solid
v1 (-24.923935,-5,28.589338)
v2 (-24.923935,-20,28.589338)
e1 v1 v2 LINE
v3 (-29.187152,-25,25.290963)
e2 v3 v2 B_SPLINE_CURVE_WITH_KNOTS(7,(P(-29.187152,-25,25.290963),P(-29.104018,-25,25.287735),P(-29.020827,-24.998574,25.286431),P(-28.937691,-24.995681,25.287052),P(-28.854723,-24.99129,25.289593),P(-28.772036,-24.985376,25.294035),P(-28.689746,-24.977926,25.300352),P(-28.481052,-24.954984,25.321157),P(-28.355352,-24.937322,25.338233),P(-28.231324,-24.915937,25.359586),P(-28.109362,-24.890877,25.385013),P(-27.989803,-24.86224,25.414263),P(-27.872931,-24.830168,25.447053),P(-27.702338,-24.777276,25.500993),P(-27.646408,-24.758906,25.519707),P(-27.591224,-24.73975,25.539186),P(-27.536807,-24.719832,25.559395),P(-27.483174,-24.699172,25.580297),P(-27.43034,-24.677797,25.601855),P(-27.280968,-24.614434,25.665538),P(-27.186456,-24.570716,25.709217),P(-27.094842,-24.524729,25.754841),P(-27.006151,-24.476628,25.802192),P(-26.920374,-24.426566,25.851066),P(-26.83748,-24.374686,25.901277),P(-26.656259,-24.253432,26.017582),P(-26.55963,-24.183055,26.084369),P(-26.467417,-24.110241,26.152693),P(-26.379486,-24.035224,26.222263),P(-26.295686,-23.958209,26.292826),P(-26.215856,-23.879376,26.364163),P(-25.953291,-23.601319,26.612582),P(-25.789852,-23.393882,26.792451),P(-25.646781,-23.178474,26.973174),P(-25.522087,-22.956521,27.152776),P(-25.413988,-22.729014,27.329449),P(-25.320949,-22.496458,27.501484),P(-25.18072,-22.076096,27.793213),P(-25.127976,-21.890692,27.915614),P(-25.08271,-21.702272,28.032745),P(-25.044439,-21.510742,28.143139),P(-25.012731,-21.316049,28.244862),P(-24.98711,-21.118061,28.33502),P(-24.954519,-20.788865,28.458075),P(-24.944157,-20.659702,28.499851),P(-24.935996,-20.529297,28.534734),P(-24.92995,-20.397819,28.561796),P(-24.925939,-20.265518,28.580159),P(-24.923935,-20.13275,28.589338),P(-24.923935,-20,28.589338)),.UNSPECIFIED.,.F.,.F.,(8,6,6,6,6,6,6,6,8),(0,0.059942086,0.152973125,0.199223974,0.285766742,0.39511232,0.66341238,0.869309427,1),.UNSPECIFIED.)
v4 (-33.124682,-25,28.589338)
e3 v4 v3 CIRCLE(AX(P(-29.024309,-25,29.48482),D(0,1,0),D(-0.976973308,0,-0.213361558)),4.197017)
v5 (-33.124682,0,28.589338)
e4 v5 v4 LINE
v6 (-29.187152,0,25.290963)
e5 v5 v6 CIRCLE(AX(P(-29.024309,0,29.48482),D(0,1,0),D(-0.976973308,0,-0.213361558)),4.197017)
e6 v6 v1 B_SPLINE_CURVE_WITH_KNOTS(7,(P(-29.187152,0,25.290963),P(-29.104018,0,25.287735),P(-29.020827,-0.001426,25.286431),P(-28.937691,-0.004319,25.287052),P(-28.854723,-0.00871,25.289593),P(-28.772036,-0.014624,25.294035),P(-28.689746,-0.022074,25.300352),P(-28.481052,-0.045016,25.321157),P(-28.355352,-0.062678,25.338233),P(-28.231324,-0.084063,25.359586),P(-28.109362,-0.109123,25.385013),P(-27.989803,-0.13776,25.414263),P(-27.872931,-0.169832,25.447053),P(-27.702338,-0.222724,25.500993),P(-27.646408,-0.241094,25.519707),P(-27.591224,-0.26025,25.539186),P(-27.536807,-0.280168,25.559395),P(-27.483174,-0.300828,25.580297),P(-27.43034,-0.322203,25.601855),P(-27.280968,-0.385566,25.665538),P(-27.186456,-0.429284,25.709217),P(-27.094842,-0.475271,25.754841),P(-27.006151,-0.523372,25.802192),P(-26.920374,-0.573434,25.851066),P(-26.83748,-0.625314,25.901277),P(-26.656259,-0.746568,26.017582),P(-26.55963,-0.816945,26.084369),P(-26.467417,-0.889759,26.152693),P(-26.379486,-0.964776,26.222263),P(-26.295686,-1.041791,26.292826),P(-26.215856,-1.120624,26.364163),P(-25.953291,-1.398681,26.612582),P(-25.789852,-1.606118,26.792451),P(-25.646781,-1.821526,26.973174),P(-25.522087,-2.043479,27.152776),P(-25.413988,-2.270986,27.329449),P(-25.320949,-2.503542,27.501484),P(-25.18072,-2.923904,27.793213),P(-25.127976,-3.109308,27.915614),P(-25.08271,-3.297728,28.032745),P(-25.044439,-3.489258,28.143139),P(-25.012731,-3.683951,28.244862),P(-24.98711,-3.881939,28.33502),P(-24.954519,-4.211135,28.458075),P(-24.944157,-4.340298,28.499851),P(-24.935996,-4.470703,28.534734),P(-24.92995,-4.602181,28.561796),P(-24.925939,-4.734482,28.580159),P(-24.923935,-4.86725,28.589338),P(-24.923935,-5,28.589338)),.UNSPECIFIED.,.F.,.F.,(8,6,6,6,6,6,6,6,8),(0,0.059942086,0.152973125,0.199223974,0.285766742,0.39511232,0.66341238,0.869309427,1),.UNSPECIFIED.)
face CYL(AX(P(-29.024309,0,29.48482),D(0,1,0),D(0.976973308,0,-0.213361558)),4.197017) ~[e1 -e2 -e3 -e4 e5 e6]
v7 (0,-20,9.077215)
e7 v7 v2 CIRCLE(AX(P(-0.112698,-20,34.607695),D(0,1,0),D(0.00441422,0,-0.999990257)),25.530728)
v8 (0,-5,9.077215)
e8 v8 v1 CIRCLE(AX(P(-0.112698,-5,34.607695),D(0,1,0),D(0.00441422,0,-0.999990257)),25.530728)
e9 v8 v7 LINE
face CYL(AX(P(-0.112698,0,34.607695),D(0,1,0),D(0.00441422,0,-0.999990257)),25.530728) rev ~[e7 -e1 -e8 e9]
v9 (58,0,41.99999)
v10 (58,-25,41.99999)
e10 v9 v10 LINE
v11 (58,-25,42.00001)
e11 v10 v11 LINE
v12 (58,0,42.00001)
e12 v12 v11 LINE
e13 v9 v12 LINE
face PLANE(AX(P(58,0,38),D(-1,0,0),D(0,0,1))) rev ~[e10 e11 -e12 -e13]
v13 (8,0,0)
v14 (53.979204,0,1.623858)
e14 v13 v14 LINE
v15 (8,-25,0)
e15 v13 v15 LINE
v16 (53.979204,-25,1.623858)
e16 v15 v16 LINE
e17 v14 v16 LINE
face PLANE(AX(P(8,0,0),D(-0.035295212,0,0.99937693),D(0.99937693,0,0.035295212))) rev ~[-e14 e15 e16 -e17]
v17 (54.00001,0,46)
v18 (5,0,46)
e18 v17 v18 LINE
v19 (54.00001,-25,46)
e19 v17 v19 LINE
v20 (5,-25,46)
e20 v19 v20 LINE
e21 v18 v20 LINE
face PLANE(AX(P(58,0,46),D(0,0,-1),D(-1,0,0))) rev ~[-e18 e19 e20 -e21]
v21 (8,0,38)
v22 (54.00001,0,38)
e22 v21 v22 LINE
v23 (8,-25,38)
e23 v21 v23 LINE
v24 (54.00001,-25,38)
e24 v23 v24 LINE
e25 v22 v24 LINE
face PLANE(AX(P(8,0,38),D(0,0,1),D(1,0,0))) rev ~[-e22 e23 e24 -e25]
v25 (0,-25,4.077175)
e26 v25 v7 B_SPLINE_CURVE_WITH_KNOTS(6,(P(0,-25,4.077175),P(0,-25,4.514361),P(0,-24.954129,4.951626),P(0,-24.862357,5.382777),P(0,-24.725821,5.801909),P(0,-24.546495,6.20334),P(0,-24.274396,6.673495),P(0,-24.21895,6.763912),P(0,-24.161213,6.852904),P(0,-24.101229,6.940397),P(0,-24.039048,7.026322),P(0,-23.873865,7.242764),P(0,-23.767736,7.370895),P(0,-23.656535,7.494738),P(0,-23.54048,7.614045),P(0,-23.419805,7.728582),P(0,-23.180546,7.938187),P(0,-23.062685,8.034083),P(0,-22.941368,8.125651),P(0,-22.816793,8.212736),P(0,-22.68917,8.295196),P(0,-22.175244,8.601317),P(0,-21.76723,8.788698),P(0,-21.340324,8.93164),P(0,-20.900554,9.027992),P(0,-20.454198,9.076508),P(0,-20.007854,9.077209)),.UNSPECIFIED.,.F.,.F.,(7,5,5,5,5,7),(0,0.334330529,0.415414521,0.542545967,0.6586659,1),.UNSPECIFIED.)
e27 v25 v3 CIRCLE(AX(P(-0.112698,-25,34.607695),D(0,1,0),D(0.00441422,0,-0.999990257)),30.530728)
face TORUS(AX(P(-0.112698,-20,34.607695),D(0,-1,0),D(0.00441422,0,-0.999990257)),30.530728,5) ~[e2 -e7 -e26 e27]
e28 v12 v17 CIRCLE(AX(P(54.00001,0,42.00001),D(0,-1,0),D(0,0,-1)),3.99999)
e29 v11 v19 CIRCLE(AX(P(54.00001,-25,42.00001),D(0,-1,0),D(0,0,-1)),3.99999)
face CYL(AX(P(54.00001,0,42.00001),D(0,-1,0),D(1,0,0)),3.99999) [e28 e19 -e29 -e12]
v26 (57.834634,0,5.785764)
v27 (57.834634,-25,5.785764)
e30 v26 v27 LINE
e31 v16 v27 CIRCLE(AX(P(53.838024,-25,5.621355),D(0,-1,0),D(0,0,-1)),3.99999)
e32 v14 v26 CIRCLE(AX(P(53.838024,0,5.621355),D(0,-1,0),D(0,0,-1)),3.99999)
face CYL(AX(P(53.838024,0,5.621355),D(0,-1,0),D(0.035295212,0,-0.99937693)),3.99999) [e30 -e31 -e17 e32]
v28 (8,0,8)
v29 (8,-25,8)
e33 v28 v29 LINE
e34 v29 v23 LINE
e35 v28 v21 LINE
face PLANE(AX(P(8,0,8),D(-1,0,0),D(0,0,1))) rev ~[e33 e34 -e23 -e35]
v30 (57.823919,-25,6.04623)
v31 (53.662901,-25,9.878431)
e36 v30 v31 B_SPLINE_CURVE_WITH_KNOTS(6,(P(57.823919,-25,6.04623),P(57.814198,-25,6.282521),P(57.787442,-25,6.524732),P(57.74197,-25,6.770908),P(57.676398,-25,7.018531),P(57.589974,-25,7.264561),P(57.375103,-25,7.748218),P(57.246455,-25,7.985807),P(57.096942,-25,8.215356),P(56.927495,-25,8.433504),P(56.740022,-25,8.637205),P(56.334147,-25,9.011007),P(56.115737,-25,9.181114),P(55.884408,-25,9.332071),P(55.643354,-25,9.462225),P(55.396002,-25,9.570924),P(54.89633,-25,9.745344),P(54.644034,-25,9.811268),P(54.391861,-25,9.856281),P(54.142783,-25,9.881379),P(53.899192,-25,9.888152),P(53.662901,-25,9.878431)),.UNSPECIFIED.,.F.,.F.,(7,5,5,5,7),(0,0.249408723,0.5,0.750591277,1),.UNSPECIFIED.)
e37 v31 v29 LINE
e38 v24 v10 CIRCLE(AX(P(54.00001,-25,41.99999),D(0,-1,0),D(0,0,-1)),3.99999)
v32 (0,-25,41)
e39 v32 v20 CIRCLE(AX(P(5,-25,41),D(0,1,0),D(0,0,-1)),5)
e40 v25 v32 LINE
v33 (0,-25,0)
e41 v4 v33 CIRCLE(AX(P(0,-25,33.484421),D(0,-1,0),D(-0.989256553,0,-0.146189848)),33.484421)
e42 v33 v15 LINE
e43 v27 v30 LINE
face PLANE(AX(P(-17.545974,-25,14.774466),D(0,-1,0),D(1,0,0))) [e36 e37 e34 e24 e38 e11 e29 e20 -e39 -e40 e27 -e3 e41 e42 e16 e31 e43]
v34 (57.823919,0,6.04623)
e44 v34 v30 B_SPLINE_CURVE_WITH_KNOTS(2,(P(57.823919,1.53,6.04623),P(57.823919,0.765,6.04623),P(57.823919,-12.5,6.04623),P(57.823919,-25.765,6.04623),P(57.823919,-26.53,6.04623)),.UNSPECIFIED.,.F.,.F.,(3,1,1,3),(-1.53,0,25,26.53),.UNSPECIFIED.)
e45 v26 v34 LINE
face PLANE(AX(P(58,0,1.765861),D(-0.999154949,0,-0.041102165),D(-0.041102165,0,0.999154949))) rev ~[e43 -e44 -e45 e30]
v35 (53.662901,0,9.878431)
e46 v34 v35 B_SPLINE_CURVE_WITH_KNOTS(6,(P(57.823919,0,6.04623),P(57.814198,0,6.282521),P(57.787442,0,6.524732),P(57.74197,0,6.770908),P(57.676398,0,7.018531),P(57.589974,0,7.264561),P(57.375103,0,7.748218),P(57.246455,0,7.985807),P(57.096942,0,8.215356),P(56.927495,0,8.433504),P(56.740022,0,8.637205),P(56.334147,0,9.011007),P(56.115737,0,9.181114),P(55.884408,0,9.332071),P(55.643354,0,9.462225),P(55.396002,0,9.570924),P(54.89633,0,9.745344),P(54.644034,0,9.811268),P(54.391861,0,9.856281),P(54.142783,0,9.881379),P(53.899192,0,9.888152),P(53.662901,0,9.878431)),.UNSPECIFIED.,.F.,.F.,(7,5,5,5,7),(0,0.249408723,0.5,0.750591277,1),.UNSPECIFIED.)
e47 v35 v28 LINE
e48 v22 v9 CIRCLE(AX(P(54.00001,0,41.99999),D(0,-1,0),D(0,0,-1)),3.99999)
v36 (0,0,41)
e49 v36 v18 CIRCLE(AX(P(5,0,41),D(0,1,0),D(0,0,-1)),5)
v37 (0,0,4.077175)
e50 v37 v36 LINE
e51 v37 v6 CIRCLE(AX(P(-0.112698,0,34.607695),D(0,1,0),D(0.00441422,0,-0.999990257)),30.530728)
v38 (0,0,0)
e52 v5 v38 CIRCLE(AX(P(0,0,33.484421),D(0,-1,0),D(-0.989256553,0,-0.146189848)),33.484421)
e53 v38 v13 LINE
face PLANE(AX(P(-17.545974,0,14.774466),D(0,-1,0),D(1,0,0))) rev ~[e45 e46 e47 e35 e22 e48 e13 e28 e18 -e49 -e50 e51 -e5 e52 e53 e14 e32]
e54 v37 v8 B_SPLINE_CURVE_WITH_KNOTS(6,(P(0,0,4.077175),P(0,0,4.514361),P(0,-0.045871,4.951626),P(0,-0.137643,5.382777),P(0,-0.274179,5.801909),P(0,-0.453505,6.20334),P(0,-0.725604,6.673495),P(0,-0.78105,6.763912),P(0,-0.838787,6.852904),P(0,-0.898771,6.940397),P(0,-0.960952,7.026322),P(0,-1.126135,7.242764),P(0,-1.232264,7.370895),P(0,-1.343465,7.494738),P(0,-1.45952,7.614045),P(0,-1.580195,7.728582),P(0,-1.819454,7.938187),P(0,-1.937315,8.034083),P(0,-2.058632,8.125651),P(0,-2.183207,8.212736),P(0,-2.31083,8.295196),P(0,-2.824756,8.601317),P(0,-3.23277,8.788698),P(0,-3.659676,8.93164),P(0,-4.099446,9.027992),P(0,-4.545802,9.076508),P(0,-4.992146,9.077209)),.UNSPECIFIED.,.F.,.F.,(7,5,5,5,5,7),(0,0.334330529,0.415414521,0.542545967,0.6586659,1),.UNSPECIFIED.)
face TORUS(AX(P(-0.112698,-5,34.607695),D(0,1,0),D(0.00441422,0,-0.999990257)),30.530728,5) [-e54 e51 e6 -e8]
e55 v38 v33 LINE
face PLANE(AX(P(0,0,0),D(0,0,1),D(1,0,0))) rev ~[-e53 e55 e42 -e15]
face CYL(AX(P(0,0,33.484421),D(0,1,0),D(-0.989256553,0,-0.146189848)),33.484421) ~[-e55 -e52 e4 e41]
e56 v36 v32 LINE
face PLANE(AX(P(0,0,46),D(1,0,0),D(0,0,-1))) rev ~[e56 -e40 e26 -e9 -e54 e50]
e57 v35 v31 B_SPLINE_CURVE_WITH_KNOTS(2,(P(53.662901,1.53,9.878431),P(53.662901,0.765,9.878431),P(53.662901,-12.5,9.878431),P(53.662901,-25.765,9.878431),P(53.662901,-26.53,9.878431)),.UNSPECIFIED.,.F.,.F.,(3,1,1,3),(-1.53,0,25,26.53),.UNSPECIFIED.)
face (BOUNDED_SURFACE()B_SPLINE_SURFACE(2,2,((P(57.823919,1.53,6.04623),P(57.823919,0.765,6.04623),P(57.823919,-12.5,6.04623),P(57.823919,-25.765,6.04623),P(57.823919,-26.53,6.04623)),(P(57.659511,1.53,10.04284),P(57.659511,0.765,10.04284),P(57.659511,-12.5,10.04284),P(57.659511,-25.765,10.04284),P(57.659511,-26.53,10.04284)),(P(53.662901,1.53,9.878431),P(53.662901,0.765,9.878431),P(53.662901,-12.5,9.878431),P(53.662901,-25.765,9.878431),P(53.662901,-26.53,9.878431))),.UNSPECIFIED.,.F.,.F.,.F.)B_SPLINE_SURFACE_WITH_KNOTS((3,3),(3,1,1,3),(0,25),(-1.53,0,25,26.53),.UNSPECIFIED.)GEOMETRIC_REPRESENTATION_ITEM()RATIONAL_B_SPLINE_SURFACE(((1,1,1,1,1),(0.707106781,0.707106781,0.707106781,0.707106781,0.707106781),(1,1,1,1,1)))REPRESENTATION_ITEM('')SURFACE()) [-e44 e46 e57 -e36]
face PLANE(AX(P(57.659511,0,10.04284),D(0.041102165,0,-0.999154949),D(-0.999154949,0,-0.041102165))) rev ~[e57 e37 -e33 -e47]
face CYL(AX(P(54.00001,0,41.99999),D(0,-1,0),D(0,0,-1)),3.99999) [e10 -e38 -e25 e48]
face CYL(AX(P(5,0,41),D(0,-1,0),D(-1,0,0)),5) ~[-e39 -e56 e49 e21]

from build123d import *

# Parameters (mm, degrees)
F0_W     = 50
F0_H     = 8
F1_DEPTH = 25
F2_R     = 3.99999
F3_R     = 5


# Not quite as in the source:
# - a fillet or chamfer is up to 0.001 mm smaller than in the source, because OpenCascade refuses the exact size


with BuildPart() as f1:
    # F0 (on Front) → F1 (new body)
    with BuildSketch(Plane.XZ):
        with BuildLine():
            ThreePointArc((-33.1246824974, 28.5893382254), (-21.8780417926, 8.1356985419), (0, 0))
            Line((0, 0), (0, 9.0772153518))
            ThreePointArc((0, 9.0772153518), (-15.8507153639, 14.5046379043), (-24.9239347471, 28.5893382254))
            ThreePointArc((-24.9239347471, 28.5893382254), (-29.0243086222, 33.6818376736), (-33.1246824974, 28.5893382254))
        make_face()
        with Locations((33, 42)):
            Rectangle(F0_W, F0_H)
        Polygon((57.6595105231, 10.0428396836), (8, 8), (57.743546671, 8), align=None)
        Polygon((0, 9.0772153518), (0, 0), (8, 0), (8, 8), (8, 38), (8, 46), (0, 46), align=None)
        Polygon((8, 8), (8, 0), (58, 1.7658608791), (57.743546671, 8), align=None)
    extrude(amount=F1_DEPTH)

    # F2 (radius 4 in the source; OpenCascade refuses exactly that, so slightly less here)
    f2_edges = [f1.edges().sort_by_distance(p)[0] for p in [
        (58, -12.5, 46),
        (58, -12.5, 38),
        (57.659511, -12.5, 10.04284),
        (58, -12.5, 1.765861),
    ]]
    fillet(f2_edges, radius=F2_R)

    # F3
    f3_edges = [f1.edges().sort_by_distance(p)[0] for p in [
        (-15.850715, -25, 14.504638),
        (-15.850715, 0, 14.504638),
        (0, -12.5, 46),
    ]]
    fillet(f3_edges, radius=F3_R)


solid = f1.part
